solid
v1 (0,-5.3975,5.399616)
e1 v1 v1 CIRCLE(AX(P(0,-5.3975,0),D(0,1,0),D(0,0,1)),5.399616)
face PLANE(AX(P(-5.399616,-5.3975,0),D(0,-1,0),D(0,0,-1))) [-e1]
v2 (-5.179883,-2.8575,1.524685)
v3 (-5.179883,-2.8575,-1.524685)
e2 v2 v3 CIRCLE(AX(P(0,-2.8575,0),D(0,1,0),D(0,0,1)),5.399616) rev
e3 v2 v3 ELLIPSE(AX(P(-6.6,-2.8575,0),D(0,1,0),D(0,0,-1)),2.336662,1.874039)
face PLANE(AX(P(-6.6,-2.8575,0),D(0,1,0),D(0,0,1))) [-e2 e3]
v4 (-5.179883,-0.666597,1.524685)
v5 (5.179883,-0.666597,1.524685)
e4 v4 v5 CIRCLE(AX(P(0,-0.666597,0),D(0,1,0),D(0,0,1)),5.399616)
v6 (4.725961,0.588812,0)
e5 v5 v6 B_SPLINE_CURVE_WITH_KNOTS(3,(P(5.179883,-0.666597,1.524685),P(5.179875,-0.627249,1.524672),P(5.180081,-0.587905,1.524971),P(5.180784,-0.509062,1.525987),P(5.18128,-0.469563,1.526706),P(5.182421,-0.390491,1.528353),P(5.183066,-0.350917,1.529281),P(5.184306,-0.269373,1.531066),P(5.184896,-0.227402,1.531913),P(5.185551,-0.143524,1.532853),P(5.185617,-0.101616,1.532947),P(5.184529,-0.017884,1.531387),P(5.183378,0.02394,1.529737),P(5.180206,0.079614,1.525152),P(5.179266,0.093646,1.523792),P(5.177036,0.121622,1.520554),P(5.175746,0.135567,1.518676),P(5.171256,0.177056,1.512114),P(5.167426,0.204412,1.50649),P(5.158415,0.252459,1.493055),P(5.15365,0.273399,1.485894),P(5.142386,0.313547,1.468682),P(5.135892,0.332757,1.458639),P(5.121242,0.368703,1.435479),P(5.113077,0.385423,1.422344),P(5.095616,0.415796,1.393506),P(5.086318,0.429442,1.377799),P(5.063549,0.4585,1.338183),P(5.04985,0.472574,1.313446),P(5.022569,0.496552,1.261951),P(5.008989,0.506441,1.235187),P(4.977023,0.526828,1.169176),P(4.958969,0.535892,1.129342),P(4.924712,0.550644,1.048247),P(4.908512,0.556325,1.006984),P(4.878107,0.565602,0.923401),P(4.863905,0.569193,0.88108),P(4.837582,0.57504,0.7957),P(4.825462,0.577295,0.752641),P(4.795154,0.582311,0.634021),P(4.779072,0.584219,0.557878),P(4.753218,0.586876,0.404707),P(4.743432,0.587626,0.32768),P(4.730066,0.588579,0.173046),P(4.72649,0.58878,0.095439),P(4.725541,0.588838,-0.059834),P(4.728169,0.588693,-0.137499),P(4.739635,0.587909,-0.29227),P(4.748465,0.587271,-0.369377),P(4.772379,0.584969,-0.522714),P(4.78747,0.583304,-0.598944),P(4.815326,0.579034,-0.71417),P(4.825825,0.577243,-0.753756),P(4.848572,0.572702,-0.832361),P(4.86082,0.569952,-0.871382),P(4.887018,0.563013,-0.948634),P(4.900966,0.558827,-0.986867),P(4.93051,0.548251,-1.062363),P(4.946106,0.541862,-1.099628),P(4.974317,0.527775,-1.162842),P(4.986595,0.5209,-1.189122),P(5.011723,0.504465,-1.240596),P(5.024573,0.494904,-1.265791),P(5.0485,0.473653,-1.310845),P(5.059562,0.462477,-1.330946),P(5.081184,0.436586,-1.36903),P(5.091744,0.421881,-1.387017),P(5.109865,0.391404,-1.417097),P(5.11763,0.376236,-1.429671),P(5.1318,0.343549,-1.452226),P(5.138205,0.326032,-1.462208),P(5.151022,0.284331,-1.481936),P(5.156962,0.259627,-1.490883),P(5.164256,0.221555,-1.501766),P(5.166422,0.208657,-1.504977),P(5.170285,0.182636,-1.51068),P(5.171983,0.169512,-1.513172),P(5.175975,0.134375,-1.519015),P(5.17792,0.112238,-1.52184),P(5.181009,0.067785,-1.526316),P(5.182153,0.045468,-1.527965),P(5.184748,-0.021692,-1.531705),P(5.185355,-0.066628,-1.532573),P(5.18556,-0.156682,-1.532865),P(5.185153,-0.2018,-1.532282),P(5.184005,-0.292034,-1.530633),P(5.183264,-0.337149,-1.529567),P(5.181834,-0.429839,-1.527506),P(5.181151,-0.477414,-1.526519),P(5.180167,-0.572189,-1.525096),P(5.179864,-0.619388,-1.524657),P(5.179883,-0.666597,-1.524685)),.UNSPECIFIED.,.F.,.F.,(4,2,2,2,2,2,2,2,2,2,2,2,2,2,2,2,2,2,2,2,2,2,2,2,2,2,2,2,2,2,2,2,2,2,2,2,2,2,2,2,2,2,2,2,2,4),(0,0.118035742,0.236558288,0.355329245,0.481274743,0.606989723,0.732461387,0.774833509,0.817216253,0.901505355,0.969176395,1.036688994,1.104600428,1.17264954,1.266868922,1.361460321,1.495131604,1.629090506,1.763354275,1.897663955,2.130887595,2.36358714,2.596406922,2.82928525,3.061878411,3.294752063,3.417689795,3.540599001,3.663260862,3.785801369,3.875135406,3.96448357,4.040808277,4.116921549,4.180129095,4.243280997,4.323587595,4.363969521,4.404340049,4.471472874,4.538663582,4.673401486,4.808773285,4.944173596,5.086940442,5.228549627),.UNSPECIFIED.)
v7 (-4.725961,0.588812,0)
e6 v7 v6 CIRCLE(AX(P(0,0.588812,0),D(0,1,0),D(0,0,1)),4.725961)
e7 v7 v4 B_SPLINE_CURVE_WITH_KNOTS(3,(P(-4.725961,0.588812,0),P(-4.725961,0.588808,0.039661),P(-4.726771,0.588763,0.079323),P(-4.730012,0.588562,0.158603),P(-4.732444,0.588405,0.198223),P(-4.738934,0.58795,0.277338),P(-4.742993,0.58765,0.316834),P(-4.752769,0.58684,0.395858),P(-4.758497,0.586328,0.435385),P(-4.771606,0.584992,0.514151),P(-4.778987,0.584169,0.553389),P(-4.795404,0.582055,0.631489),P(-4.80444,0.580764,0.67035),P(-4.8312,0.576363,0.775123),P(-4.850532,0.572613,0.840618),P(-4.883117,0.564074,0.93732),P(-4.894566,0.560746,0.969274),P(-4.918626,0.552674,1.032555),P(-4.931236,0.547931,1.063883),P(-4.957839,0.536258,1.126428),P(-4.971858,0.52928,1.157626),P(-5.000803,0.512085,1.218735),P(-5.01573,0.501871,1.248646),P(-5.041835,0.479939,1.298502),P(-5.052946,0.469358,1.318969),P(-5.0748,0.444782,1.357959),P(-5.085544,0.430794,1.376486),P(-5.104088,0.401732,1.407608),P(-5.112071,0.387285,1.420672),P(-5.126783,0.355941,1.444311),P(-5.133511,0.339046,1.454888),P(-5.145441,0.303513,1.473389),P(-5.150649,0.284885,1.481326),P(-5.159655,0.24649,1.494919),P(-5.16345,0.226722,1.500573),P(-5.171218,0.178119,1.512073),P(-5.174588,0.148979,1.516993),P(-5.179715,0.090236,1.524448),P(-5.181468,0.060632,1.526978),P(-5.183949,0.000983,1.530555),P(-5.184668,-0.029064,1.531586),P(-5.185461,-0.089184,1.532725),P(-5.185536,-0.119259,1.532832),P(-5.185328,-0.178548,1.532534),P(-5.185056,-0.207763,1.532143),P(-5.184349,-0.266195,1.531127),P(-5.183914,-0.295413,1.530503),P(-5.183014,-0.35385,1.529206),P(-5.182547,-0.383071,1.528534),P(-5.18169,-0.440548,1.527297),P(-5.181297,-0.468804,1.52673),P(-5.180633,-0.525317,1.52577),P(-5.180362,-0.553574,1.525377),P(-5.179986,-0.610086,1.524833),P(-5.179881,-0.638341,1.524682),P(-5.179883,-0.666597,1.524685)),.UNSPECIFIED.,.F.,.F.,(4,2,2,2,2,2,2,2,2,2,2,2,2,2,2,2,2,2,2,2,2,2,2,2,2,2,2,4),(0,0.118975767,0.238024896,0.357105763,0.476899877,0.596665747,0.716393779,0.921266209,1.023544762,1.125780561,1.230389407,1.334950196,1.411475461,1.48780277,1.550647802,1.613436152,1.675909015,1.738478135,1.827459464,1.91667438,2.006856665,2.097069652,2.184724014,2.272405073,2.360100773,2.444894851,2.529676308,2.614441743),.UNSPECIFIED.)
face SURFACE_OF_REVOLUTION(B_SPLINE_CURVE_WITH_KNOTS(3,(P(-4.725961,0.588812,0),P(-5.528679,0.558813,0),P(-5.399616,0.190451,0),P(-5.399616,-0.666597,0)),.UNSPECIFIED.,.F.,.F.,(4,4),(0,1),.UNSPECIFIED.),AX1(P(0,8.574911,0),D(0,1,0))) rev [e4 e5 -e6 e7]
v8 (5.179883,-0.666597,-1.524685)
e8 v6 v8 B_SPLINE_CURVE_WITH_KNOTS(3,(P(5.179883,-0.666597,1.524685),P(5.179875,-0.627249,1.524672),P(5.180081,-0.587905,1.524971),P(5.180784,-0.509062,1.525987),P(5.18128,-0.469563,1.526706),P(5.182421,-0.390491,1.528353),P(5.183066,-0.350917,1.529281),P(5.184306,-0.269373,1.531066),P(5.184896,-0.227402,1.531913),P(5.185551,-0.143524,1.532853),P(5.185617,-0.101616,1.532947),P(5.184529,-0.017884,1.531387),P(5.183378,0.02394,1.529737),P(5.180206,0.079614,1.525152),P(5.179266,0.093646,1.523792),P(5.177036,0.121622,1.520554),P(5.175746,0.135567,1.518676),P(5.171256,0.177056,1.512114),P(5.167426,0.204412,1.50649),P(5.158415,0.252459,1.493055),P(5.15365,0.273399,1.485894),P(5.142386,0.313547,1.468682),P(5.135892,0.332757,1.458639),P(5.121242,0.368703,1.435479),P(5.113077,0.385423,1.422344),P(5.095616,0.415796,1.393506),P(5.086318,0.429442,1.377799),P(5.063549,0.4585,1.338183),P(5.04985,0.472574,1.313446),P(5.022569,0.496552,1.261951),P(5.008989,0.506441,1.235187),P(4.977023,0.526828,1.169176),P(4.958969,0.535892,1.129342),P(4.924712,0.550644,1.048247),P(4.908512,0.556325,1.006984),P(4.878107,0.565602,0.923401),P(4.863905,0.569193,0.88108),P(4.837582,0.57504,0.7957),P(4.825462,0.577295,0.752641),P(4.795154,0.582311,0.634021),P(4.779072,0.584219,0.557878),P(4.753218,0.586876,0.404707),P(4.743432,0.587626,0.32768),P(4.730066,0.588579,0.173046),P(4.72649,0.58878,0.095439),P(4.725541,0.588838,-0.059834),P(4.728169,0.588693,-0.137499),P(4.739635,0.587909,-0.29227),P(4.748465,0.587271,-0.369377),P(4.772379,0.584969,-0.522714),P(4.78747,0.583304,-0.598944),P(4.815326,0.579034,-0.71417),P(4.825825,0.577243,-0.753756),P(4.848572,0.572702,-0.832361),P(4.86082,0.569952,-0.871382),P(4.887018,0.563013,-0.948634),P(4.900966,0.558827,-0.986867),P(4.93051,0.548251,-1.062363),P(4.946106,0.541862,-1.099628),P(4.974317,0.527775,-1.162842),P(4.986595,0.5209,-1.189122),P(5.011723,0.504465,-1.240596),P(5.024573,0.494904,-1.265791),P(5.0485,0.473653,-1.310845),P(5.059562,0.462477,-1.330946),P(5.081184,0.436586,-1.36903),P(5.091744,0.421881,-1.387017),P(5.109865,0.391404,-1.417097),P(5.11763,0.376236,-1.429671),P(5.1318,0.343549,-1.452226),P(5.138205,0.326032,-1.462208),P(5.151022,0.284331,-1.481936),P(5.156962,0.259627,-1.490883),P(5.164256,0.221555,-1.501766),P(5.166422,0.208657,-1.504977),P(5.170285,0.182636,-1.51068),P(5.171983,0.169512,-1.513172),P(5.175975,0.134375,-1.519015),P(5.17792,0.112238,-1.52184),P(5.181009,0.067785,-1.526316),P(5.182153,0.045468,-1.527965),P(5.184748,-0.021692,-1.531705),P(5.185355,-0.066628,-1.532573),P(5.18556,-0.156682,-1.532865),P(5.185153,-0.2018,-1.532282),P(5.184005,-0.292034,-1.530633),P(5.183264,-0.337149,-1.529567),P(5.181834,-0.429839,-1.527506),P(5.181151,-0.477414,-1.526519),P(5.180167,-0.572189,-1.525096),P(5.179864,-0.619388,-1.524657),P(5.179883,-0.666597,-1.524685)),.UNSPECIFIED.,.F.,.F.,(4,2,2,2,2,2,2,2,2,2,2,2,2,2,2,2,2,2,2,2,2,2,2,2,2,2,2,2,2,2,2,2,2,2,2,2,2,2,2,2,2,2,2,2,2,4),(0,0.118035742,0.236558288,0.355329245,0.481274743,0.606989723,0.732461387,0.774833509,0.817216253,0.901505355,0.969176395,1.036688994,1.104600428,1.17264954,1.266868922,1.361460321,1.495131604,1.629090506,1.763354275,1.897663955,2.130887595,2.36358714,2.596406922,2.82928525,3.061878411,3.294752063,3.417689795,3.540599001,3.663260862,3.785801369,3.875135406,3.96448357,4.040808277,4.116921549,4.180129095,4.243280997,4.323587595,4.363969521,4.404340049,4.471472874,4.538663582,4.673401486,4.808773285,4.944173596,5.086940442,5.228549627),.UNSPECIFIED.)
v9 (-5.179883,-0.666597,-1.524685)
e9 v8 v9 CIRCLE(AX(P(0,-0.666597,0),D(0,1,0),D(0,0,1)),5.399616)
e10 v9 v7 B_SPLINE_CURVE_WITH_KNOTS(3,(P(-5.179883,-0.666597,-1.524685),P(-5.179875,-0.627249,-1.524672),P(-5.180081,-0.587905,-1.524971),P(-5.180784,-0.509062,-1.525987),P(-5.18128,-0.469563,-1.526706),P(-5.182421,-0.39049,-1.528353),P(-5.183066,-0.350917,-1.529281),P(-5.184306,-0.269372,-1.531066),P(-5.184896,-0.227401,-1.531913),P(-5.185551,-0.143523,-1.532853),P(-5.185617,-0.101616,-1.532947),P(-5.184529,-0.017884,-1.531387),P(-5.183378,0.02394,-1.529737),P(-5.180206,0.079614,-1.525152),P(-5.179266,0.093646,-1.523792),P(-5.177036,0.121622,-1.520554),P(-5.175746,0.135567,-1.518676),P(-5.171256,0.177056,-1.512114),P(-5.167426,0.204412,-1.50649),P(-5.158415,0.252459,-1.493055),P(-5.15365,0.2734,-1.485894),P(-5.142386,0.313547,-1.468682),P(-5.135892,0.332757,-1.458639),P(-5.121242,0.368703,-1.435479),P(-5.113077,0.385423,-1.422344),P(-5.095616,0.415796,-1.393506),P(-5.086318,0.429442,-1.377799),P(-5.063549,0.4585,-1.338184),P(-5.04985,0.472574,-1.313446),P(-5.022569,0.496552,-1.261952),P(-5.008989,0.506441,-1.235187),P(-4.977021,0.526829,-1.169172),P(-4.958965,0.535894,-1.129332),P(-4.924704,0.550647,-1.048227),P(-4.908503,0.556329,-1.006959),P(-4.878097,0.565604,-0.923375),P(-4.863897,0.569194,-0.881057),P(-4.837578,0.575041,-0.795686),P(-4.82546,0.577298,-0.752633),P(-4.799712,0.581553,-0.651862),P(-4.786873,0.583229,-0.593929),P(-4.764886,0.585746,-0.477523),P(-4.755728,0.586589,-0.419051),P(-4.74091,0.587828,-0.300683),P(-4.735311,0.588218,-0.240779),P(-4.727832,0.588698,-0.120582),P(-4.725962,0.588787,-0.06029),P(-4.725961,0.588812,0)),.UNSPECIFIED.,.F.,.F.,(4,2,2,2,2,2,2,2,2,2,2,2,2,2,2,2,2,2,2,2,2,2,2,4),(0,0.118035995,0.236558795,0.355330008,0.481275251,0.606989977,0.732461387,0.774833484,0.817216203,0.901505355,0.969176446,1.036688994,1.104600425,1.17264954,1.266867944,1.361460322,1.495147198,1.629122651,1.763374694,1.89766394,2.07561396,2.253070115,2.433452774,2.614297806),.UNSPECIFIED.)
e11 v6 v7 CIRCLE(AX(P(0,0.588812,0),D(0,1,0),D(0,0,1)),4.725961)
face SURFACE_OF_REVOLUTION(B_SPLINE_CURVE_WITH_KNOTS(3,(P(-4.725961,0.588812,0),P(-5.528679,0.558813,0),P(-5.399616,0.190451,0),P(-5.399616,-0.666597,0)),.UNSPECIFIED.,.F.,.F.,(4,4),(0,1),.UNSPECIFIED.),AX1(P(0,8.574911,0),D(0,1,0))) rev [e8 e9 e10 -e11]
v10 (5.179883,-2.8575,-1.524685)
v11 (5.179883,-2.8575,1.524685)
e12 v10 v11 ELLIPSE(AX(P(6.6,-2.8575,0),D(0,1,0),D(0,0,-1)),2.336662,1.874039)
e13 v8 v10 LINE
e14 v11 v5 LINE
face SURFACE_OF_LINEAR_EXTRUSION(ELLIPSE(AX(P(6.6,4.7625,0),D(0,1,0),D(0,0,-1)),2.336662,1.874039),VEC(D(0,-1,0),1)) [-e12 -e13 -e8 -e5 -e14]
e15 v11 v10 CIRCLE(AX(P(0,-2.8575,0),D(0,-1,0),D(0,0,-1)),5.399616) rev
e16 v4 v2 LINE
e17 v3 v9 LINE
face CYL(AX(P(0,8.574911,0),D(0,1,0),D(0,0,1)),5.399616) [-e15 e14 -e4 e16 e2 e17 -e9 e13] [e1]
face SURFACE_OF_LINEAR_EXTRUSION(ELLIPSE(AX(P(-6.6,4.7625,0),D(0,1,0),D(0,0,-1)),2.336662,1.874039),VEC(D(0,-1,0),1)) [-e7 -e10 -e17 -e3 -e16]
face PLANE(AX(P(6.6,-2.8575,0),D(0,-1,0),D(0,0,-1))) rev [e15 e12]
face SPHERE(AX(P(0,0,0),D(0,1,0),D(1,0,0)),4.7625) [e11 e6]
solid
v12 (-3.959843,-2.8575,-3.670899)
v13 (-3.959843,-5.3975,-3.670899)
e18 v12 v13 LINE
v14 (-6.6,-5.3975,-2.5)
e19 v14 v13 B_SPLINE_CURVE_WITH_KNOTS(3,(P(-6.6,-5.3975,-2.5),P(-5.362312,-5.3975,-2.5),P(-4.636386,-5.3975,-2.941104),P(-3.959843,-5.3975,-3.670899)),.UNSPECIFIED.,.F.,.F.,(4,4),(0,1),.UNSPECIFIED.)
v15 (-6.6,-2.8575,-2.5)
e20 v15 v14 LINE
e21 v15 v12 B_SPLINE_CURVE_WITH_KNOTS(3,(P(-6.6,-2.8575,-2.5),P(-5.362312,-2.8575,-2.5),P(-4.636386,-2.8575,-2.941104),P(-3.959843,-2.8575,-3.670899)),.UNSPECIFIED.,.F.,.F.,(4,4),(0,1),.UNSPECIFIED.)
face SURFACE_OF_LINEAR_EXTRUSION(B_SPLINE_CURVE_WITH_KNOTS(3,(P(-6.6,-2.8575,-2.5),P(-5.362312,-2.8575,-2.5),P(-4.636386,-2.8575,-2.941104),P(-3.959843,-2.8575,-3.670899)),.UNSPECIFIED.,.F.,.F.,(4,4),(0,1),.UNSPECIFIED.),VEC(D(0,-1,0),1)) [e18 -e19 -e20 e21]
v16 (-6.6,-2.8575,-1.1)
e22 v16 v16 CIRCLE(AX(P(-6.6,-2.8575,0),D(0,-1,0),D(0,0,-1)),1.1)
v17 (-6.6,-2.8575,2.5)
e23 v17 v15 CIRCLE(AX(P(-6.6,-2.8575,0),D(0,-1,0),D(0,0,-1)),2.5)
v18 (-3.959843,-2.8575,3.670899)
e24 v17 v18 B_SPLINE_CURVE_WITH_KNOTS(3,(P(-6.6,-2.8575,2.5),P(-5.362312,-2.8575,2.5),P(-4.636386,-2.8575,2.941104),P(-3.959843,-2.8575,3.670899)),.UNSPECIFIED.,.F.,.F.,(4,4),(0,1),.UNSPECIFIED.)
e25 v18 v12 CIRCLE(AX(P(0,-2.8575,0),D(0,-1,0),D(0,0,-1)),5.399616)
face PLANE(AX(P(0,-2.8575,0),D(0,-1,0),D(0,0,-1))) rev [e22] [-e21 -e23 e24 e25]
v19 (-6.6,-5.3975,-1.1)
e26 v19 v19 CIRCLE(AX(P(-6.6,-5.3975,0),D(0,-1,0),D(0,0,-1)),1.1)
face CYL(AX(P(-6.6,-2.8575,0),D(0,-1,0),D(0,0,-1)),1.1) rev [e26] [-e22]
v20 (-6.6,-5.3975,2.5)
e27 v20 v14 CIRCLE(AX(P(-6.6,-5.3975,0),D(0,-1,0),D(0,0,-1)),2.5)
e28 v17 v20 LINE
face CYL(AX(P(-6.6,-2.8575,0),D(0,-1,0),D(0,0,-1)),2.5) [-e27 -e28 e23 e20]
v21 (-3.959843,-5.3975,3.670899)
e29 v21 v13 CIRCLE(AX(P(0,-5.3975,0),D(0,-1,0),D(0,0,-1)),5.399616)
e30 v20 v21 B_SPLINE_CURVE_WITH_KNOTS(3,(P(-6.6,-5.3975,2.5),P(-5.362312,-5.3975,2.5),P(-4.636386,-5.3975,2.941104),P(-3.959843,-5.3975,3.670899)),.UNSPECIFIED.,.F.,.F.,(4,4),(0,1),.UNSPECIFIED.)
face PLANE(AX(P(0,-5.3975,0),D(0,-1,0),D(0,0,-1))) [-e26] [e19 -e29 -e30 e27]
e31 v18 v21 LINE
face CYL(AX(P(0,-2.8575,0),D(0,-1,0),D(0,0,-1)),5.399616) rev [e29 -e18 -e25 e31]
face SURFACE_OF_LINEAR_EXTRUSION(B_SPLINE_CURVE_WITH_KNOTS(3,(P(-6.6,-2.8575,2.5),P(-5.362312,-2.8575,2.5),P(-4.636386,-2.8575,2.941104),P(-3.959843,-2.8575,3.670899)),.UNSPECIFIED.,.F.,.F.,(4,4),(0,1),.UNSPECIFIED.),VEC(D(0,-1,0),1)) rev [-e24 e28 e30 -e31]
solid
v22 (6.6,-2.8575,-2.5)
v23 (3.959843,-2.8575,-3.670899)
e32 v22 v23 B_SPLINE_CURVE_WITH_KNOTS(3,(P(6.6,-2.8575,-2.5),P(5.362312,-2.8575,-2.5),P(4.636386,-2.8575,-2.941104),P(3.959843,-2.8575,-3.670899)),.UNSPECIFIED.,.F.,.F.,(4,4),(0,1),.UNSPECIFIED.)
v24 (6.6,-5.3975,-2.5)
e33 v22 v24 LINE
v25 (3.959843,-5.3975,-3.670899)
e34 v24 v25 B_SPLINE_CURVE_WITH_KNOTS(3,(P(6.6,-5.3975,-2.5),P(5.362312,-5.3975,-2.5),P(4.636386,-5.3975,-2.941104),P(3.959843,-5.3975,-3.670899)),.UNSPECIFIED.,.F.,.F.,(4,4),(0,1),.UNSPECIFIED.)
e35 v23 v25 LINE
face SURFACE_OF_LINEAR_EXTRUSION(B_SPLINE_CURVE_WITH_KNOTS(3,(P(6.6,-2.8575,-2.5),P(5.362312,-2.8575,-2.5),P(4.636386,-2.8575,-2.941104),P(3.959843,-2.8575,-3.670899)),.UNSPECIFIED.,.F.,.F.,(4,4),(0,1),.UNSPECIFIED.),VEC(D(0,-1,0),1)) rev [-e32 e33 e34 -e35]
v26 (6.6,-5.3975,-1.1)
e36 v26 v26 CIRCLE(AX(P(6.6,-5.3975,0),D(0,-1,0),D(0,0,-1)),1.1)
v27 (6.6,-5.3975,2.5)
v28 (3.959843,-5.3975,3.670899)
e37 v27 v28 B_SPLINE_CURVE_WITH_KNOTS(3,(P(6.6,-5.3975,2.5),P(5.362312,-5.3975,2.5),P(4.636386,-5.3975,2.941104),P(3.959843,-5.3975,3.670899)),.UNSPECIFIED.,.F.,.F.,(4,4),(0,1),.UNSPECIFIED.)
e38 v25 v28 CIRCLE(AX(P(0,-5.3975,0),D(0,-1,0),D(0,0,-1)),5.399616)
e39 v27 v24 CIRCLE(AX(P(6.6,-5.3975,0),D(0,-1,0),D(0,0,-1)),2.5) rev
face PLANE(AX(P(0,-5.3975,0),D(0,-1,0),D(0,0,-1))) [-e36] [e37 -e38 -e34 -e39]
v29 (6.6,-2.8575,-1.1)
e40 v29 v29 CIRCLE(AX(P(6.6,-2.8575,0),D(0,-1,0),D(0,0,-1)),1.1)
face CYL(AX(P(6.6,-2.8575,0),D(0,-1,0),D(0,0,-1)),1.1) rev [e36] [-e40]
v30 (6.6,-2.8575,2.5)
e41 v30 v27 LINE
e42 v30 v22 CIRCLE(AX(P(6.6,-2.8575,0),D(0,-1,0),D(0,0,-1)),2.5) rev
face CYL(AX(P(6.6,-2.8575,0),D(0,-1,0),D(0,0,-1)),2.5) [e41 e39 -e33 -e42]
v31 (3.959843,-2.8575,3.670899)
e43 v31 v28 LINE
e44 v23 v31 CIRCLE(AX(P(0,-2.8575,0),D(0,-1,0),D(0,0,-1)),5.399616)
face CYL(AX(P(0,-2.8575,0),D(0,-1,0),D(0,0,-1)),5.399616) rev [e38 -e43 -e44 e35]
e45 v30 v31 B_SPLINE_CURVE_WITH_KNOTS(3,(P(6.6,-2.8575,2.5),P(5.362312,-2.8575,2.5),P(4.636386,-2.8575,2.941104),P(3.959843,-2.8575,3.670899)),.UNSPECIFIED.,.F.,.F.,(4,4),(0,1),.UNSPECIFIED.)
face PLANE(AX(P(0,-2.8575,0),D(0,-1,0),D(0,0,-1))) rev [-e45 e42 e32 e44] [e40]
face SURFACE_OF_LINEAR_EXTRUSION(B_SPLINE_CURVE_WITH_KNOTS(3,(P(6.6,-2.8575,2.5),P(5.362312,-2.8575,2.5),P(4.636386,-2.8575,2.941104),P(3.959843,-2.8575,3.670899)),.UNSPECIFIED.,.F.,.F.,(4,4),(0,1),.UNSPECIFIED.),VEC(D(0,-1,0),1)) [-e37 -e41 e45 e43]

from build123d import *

# Parameters (mm, degrees)
BOSS_EXTRUDE1_START     = -2.54
BOSS_EXTRUDE1_OUTLINE_R = 1.1
BOSS_EXTRUDE1_DEPTH     = 2.54
SKETCH3_RX              = 2.33666154
SKETCH3_RY              = 1.874039112
CUT_EXTRUDE1_DEPTH      = 14.04273116


# Read off the part's stored shape, not the designer's step: Boss-Extrude1
with BuildPart() as part:
    # Sketch1 → Revolve3 (revolve)
    with BuildSketch(Plane.XY, mode=Mode.PRIVATE) as revolve3_sk:
        with BuildLine():
            Line((0, -5.3975), (0, 4.7625))
            ThreePointArc((0, 4.7625), (-3.152553538, 3.569707612), (-4.725960888, 0.58881231))
            add(Edge.make_bspline(
                [(-4.725960888, 0.58881231), (-5.528679385, 0.558813228), (-5.399616231, 0.190451496), (-5.399616231, -0.666596714)],
                knots=[0, 0, 0, 0, 1, 1, 1, 1], degree=3))
            Line((-5.399616231, -0.666596714), (-5.399616231, -5.3975))
            Line((-5.399616231, -5.3975), (0, -5.3975))
        make_face()
    revolve(revolve3_sk.sketch.rotate(Axis((0, 8.574910523, 0), (0, -1, 0)), 180), axis=Axis((0, 8.574910523, 0), (0, -1, 0)))

    # Sketch3 → Cut-Extrude1 (cut, through all)
    with BuildSketch(Plane(origin=(0, -2.8575, 0), x_dir=(1, 0, 0), z_dir=(0, 1, 0))):
        with Locations(Location((-6.6, 0), (0, 0, 90))):
            Ellipse(SKETCH3_RX, SKETCH3_RY)
        with Locations(Location((6.6, 0), (0, 0, 90))):
            Ellipse(SKETCH3_RX, SKETCH3_RY)
    extrude(amount=CUT_EXTRUDE1_DEPTH, mode=Mode.SUBTRACT)


with BuildPart() as body_2:
    # Boss-Extrude1 outline → Boss-Extrude1 (new body)
    # profile 1 of 2: a face of its own
    with BuildSketch(Plane.XZ.offset(5.3975).offset(BOSS_EXTRUDE1_START)):
        with BuildLine():
            add(Edge.make_bspline(
                [(6.6, -2.5), (5.362311666, -2.5), (4.636385799, -2.941104214), (3.959842535, -3.670899419)],
                knots=[0, 0, 0, 0, 1, 1, 1, 1], degree=3))
            ThreePointArc((6.6, -2.5), (9.1, 0), (6.6, 2.5))
            add(Edge.make_bspline(
                [(6.6, 2.5), (5.362311666, 2.5), (4.636385799, 2.941104214), (3.959842535, 3.670899419)],
                knots=[0, 0, 0, 0, 1, 1, 1, 1], degree=3))
            ThreePointArc((3.959842535, 3.670899419), (5.399616231, 0), (3.959842535, -3.670899419))
        make_face()
        with Locations((6.6, 0)):
            Circle(BOSS_EXTRUDE1_OUTLINE_R, mode=Mode.SUBTRACT)
    # profile 2 of 2: a face of its own
    with BuildSketch(Plane.XZ.offset(5.3975).offset(BOSS_EXTRUDE1_START)):
        with BuildLine():
            ThreePointArc((-6.6, 2.5), (-9.1, 0), (-6.6, -2.5))
            add(Edge.make_bspline(
                [(-6.6, -2.5), (-5.362311666, -2.5), (-4.636385799, -2.941104214), (-3.959842535, -3.670899419)],
                knots=[0, 0, 0, 0, 1, 1, 1, 1], degree=3))
            ThreePointArc((-3.959842535, -3.670899419), (-5.399616231, 0), (-3.959842535, 3.670899419))
            add(Edge.make_bspline(
                [(-6.6, 2.5), (-5.362311666, 2.5), (-4.636385799, 2.941104214), (-3.959842535, 3.670899419)],
                knots=[0, 0, 0, 0, 1, 1, 1, 1], degree=3))
        make_face()
        with Locations((-6.6, 0)):
            Circle(BOSS_EXTRUDE1_OUTLINE_R, mode=Mode.SUBTRACT)
    extrude(amount=BOSS_EXTRUDE1_DEPTH)


solid = Compound([part.part, body_2.part])
